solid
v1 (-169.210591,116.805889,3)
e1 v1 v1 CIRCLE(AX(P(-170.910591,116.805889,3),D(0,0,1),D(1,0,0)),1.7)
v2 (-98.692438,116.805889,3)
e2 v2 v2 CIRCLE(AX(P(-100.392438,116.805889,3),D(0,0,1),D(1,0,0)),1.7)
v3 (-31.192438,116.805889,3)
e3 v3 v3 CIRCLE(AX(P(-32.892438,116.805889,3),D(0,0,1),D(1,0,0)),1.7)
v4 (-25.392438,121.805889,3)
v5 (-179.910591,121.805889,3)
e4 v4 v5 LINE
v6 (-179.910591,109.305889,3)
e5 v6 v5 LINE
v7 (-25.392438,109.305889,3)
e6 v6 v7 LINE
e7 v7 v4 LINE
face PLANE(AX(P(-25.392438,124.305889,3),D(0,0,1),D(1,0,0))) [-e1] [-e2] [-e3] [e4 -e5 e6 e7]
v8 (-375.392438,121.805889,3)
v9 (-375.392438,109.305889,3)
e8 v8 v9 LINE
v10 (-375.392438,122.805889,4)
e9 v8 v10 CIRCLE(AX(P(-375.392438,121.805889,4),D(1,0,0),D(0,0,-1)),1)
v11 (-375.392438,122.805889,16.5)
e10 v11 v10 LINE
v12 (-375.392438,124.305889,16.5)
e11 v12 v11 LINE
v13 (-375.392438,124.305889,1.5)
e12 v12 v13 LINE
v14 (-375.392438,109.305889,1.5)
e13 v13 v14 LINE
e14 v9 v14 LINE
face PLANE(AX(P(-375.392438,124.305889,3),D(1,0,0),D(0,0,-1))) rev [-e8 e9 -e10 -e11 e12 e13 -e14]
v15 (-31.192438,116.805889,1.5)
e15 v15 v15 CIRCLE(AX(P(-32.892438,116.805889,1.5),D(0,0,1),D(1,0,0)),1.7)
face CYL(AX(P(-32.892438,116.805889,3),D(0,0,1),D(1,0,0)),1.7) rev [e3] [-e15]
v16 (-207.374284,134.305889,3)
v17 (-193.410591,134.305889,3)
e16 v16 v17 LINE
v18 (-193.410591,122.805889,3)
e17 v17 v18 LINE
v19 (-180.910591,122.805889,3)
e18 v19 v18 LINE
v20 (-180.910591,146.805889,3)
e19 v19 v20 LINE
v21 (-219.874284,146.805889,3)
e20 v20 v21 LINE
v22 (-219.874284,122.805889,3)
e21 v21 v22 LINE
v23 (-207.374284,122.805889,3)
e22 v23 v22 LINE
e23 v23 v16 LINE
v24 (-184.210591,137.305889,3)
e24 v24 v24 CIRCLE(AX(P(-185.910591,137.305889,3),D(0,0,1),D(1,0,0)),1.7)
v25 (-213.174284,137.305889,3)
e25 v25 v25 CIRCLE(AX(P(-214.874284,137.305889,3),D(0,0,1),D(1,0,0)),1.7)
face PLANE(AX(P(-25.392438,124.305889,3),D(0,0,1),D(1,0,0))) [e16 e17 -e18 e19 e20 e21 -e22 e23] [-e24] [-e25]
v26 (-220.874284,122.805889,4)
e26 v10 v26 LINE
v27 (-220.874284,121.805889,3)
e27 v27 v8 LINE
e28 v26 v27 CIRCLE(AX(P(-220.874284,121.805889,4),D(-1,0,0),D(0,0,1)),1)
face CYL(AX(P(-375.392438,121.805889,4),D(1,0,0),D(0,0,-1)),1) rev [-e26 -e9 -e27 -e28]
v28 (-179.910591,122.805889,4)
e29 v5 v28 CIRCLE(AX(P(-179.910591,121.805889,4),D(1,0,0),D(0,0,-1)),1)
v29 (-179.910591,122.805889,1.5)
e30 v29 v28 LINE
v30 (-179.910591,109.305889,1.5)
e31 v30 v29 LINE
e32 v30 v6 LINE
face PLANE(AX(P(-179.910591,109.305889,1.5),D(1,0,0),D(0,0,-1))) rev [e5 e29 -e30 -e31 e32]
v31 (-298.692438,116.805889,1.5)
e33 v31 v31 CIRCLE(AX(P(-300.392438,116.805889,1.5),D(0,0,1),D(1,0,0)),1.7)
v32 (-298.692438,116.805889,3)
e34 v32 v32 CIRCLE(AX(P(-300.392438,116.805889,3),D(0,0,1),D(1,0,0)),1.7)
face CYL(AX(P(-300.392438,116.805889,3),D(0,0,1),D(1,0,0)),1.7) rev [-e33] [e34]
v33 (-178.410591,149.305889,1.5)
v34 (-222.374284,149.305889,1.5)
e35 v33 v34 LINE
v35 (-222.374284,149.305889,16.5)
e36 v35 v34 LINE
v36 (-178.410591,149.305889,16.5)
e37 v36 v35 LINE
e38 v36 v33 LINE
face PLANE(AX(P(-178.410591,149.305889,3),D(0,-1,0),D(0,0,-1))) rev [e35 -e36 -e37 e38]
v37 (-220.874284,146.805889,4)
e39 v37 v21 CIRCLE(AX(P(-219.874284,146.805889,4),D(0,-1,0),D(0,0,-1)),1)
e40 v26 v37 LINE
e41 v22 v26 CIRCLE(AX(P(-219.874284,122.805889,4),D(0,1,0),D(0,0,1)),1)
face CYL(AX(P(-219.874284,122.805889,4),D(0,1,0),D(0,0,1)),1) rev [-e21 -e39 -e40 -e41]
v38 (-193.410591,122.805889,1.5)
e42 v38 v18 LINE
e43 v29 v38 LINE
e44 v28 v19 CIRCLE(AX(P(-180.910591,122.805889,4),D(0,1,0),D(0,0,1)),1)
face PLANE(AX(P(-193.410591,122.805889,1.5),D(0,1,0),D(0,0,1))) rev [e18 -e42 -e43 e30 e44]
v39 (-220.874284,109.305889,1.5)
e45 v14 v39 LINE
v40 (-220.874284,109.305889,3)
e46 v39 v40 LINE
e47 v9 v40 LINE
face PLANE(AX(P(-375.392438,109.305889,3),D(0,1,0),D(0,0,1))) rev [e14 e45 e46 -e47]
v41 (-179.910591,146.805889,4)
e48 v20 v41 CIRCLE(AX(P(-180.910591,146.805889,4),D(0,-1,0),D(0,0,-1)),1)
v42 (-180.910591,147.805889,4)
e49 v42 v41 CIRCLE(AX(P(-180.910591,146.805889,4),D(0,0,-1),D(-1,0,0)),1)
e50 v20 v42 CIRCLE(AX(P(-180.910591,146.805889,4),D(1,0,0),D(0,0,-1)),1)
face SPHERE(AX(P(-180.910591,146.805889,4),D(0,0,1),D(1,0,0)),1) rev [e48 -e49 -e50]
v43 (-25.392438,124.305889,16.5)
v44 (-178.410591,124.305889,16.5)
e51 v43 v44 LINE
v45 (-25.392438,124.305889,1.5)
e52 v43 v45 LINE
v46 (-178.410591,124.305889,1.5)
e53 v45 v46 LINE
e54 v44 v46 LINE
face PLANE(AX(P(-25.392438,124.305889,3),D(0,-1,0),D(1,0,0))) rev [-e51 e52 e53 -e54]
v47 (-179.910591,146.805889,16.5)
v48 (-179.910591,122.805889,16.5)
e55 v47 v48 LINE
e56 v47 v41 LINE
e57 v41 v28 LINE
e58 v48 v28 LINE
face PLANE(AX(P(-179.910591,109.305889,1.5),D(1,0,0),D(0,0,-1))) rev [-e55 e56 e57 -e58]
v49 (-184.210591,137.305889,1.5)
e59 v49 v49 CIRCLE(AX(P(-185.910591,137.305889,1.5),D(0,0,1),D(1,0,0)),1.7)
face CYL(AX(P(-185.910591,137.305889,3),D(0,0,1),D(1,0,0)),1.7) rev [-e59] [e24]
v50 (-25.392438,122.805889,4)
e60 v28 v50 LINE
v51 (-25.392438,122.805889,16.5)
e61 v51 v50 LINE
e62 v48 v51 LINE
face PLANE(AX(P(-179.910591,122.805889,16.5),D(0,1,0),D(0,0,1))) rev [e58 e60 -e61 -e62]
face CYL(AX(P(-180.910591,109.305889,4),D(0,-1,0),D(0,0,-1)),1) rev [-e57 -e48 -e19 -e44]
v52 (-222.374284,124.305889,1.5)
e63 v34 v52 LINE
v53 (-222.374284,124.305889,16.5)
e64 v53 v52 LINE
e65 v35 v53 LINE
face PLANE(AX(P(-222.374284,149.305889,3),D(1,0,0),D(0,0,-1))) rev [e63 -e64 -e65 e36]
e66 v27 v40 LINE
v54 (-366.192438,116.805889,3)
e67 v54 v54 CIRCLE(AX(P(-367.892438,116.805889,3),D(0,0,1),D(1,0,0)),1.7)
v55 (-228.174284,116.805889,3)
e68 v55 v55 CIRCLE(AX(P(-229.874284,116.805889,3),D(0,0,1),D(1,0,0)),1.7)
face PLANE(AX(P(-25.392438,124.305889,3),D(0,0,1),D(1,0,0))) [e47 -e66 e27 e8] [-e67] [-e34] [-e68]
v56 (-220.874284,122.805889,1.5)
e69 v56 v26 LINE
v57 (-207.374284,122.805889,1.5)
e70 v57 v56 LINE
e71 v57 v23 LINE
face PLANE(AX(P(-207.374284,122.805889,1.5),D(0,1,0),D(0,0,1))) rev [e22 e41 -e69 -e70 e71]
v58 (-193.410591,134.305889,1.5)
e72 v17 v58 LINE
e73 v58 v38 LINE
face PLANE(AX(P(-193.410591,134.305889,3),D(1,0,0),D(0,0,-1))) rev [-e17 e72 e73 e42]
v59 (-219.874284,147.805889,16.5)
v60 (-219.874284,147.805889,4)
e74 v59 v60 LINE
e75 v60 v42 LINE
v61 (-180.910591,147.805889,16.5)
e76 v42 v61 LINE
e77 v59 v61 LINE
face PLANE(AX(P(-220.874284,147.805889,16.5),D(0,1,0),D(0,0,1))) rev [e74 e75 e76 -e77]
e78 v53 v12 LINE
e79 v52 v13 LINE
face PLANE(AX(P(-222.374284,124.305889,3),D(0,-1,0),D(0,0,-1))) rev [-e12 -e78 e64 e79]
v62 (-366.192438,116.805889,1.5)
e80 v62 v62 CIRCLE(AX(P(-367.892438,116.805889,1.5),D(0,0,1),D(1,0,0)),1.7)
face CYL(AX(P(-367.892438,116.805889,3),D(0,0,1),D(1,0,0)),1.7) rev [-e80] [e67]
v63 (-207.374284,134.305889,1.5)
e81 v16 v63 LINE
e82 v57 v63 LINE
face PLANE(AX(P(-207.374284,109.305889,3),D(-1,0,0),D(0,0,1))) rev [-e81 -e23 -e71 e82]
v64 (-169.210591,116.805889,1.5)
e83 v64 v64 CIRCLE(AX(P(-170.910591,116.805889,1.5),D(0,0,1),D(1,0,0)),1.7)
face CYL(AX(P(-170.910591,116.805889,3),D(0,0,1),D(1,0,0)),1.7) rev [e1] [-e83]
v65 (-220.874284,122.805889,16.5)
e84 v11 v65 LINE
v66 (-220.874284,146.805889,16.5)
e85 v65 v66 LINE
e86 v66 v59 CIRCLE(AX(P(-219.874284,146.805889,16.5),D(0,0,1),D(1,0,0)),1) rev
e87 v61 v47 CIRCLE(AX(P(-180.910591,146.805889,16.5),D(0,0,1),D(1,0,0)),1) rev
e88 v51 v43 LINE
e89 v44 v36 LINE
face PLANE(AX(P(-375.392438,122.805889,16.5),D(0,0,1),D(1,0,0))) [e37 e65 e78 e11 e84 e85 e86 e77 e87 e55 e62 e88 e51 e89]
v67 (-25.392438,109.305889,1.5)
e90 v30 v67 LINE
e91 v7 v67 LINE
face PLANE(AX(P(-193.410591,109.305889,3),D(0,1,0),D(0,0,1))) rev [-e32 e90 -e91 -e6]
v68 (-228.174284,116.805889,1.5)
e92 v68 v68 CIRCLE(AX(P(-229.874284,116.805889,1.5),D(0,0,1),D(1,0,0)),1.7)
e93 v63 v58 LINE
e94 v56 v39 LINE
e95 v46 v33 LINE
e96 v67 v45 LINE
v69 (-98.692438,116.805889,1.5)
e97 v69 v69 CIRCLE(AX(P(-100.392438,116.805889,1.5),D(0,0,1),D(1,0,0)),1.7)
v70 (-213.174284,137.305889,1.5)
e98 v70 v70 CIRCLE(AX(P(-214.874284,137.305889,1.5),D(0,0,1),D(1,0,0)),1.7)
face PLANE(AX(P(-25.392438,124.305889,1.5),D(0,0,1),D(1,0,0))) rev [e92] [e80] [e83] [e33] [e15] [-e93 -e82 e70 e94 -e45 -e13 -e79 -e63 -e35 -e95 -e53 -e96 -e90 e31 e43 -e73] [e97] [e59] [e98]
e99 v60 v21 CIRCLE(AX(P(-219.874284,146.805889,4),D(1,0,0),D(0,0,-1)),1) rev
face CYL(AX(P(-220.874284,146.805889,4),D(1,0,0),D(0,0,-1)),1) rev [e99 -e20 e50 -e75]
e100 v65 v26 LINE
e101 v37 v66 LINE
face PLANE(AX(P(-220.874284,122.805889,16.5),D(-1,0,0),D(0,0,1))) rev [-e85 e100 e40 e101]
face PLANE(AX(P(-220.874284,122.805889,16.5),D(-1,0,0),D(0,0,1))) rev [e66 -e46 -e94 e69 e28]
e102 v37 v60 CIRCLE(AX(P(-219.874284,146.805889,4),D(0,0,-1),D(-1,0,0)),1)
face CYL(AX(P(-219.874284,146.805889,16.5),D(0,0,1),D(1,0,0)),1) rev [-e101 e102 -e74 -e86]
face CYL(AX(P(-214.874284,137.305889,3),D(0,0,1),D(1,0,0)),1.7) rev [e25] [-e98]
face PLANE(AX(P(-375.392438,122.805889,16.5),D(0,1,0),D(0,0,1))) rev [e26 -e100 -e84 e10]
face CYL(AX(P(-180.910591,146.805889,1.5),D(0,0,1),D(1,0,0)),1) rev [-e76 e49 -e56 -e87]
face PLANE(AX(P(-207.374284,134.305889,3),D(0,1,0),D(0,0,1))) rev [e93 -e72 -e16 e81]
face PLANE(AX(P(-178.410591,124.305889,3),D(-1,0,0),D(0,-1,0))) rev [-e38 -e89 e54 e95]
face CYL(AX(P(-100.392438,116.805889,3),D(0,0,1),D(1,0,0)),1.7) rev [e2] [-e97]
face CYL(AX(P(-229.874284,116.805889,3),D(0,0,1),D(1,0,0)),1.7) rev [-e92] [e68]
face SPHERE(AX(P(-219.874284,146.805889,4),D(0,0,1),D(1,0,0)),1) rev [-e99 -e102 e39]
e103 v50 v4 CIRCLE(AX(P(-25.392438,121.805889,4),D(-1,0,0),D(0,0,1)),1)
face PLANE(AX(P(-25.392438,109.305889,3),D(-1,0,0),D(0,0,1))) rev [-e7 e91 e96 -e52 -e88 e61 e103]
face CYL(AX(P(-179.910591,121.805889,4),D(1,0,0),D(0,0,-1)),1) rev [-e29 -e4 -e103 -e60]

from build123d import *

# Parameters (mm, degrees)
BOSS_EXTRU_1_DEPTH      = 1.5
BOSS_EXTRU_2_DEPTH      = 13.5
D_GAGEMENT_M32_D        = 3.4
D_GAGEMENT_M32_DEPTH    = 10
D_GAGEMENT_M32_TIP      = 1.021463052
D_GAGEMENT_M31_D        = 3.4
D_GAGEMENT_M31_DEPTH    = 10
D_GAGEMENT_M31_TIP      = 1.021463052
ESQUISSE12_W            = 13.5
ESQUISSE12_H            = 13.5
ENL_V_MAT_EXTRU_1_DEPTH = 1.5
CONG_1_R                = 1
CONG_2_R                = 1


# Some blends are built 0.0001 mm under size
with BuildPart() as part:
    # Esquisse2 → Boss.-Extru.1 (new body)
    with BuildSketch(Plane.XY.offset(1.5)):
        Polygon((-25.392437762, 124.305889048), (-178.410591433, 124.305889048), (-178.410591433, 149.305889048), (-222.374284091, 149.305889048), (-222.374284091, 124.305889048), (-375.392437762, 124.305889048), (-375.392437762, 109.305889048), (-207.374284091, 109.305889048), (-207.374284091, 134.305889048), (-193.410591433, 134.305889048), (-193.410591433, 109.305889048), (-25.392437762, 109.305889048), align=None)
    extrude(amount=BOSS_EXTRU_1_DEPTH)

    # Esquisse3 → Boss.-Extru.2 (add)
    with BuildSketch(Plane.XY.offset(3)):
        Polygon((-375.392437762, 122.805889048), (-220.874284091, 122.805889048), (-220.874284091, 147.805889048), (-179.910591433, 147.805889048), (-179.910591433, 122.805889048), (-25.392437762, 122.805889048), (-25.392437762, 124.305889048), (-178.410591433, 124.305889048), (-178.410591433, 149.305889048), (-222.374284091, 149.305889048), (-222.374284091, 124.305889048), (-375.392437762, 124.305889048), align=None)
    extrude(amount=BOSS_EXTRU_2_DEPTH)

    # Dégagement M32
    with Locations(Plane(origin=(-229.874284091, 116.805889048, 3), x_dir=(1, 0, 0), z_dir=(0, 0, 1))):
        with Locations((0, 0), (-70.518153671, 0), (-138.018153671, 0), (58.963692658, 0), (129.481846329, 0), (196.981846329, 0)):
            Hole(D_GAGEMENT_M32_D / 2, depth=D_GAGEMENT_M32_DEPTH)
            with Locations((0, 0, -(D_GAGEMENT_M32_DEPTH + D_GAGEMENT_M32_TIP / 2))):  # 118° drill point
                Cone(0, D_GAGEMENT_M32_D / 2, D_GAGEMENT_M32_TIP, mode=Mode.SUBTRACT)

    # Dégagement M31
    with Locations(Plane(origin=(-214.874284091, 137.305889048, 3), x_dir=(1, 0, 0), z_dir=(0, 0, 1))):
        with Locations((0, 0), (28.963692658, 0)):
            Hole(D_GAGEMENT_M31_D / 2, depth=D_GAGEMENT_M31_DEPTH)
            with Locations((0, 0, -(D_GAGEMENT_M31_DEPTH + D_GAGEMENT_M31_TIP / 2))):  # 118° drill point
                Cone(0, D_GAGEMENT_M31_D / 2, D_GAGEMENT_M31_TIP, mode=Mode.SUBTRACT)

    # Esquisse12 → Enlèv. mat.-Extru.1 (cut)
    with BuildSketch(Plane.XY.offset(3)):
        with Locations((-214.124284091, 116.055889048)):
            Rectangle(ESQUISSE12_W, ESQUISSE12_H)
        with Locations((-186.660591433, 116.055889048)):
            Rectangle(ESQUISSE12_W, ESQUISSE12_H)
    extrude(amount=-ENL_V_MAT_EXTRU_1_DEPTH, mode=Mode.SUBTRACT)

    # Congé1
    # the kernel refuses this fillet: 1 mm, written as the material it adds along each edge
    with BuildSketch(Plane(origin=(-179.910591433, 122.805889048, 3), x_dir=(0, -1, 0), z_dir=(1, 0, 0))) as cong_1_piece_1:
        with BuildLine():
            CenterArc((CONG_1_R, -CONG_1_R), CONG_1_R, 90, 90)
            Line((0, -CONG_1_R), (0, 0))
            Line((0, 0), (CONG_1_R, 0))
        make_face()
    extrude(amount=154.518153671)
    with BuildSketch(Plane(origin=(-223.374284091, 147.805889048, 3), x_dir=(0, 0, 1), z_dir=(1, 0, 0))) as cong_1_piece_2_section:
        with BuildLine():
            CenterArc((CONG_1_R, CONG_1_R), CONG_1_R, 180, 90)
            Line((0, CONG_1_R), (0, 0))
            Line((0, 0), (CONG_1_R, 0))
        make_face()
    cong_1_piece_2 = extrude(amount=43.463692658, mode=Mode.PRIVATE)
    cong_1_piece_2 = split(cong_1_piece_2, bisect_by=Plane(origin=(-222.374284091, 147.582521109, 3.223367939), z_dir=(1, 0, 0)), keep=Keep.TOP, mode=Mode.PRIVATE)
    add(cong_1_piece_2)
    with BuildSketch(Plane(origin=(-375.392437762, 122.805889048, 3), x_dir=(0, 0, 1), z_dir=(1, 0, 0))) as cong_1_piece_3:
        with BuildLine():
            CenterArc((CONG_1_R, CONG_1_R), CONG_1_R, 180, 90)
            Line((0, CONG_1_R), (0, 0))
            Line((0, 0), (CONG_1_R, 0))
        make_face()
    extrude(amount=154.518153671)

    # Congé2
    cong_2_edges = [part.edges().sort_by_distance(p)[0] for p in [
        (-179.910591433, 134.805889048, 3),
        (-179.910591433, 147.512995829, 3.292893219),
        (-220.874284091, 147.512995829, 3.292893219),
        (-220.874284091, 134.805889048, 3),
        (-220.874284091, 147.805889048, 10.25),
        (-179.910591433, 147.805889048, 10.25),
    ]]
    fillet(cong_2_edges, radius=CONG_2_R - 0.0001)  # a hair under: the kernel refuses the full size


solid = part.part
